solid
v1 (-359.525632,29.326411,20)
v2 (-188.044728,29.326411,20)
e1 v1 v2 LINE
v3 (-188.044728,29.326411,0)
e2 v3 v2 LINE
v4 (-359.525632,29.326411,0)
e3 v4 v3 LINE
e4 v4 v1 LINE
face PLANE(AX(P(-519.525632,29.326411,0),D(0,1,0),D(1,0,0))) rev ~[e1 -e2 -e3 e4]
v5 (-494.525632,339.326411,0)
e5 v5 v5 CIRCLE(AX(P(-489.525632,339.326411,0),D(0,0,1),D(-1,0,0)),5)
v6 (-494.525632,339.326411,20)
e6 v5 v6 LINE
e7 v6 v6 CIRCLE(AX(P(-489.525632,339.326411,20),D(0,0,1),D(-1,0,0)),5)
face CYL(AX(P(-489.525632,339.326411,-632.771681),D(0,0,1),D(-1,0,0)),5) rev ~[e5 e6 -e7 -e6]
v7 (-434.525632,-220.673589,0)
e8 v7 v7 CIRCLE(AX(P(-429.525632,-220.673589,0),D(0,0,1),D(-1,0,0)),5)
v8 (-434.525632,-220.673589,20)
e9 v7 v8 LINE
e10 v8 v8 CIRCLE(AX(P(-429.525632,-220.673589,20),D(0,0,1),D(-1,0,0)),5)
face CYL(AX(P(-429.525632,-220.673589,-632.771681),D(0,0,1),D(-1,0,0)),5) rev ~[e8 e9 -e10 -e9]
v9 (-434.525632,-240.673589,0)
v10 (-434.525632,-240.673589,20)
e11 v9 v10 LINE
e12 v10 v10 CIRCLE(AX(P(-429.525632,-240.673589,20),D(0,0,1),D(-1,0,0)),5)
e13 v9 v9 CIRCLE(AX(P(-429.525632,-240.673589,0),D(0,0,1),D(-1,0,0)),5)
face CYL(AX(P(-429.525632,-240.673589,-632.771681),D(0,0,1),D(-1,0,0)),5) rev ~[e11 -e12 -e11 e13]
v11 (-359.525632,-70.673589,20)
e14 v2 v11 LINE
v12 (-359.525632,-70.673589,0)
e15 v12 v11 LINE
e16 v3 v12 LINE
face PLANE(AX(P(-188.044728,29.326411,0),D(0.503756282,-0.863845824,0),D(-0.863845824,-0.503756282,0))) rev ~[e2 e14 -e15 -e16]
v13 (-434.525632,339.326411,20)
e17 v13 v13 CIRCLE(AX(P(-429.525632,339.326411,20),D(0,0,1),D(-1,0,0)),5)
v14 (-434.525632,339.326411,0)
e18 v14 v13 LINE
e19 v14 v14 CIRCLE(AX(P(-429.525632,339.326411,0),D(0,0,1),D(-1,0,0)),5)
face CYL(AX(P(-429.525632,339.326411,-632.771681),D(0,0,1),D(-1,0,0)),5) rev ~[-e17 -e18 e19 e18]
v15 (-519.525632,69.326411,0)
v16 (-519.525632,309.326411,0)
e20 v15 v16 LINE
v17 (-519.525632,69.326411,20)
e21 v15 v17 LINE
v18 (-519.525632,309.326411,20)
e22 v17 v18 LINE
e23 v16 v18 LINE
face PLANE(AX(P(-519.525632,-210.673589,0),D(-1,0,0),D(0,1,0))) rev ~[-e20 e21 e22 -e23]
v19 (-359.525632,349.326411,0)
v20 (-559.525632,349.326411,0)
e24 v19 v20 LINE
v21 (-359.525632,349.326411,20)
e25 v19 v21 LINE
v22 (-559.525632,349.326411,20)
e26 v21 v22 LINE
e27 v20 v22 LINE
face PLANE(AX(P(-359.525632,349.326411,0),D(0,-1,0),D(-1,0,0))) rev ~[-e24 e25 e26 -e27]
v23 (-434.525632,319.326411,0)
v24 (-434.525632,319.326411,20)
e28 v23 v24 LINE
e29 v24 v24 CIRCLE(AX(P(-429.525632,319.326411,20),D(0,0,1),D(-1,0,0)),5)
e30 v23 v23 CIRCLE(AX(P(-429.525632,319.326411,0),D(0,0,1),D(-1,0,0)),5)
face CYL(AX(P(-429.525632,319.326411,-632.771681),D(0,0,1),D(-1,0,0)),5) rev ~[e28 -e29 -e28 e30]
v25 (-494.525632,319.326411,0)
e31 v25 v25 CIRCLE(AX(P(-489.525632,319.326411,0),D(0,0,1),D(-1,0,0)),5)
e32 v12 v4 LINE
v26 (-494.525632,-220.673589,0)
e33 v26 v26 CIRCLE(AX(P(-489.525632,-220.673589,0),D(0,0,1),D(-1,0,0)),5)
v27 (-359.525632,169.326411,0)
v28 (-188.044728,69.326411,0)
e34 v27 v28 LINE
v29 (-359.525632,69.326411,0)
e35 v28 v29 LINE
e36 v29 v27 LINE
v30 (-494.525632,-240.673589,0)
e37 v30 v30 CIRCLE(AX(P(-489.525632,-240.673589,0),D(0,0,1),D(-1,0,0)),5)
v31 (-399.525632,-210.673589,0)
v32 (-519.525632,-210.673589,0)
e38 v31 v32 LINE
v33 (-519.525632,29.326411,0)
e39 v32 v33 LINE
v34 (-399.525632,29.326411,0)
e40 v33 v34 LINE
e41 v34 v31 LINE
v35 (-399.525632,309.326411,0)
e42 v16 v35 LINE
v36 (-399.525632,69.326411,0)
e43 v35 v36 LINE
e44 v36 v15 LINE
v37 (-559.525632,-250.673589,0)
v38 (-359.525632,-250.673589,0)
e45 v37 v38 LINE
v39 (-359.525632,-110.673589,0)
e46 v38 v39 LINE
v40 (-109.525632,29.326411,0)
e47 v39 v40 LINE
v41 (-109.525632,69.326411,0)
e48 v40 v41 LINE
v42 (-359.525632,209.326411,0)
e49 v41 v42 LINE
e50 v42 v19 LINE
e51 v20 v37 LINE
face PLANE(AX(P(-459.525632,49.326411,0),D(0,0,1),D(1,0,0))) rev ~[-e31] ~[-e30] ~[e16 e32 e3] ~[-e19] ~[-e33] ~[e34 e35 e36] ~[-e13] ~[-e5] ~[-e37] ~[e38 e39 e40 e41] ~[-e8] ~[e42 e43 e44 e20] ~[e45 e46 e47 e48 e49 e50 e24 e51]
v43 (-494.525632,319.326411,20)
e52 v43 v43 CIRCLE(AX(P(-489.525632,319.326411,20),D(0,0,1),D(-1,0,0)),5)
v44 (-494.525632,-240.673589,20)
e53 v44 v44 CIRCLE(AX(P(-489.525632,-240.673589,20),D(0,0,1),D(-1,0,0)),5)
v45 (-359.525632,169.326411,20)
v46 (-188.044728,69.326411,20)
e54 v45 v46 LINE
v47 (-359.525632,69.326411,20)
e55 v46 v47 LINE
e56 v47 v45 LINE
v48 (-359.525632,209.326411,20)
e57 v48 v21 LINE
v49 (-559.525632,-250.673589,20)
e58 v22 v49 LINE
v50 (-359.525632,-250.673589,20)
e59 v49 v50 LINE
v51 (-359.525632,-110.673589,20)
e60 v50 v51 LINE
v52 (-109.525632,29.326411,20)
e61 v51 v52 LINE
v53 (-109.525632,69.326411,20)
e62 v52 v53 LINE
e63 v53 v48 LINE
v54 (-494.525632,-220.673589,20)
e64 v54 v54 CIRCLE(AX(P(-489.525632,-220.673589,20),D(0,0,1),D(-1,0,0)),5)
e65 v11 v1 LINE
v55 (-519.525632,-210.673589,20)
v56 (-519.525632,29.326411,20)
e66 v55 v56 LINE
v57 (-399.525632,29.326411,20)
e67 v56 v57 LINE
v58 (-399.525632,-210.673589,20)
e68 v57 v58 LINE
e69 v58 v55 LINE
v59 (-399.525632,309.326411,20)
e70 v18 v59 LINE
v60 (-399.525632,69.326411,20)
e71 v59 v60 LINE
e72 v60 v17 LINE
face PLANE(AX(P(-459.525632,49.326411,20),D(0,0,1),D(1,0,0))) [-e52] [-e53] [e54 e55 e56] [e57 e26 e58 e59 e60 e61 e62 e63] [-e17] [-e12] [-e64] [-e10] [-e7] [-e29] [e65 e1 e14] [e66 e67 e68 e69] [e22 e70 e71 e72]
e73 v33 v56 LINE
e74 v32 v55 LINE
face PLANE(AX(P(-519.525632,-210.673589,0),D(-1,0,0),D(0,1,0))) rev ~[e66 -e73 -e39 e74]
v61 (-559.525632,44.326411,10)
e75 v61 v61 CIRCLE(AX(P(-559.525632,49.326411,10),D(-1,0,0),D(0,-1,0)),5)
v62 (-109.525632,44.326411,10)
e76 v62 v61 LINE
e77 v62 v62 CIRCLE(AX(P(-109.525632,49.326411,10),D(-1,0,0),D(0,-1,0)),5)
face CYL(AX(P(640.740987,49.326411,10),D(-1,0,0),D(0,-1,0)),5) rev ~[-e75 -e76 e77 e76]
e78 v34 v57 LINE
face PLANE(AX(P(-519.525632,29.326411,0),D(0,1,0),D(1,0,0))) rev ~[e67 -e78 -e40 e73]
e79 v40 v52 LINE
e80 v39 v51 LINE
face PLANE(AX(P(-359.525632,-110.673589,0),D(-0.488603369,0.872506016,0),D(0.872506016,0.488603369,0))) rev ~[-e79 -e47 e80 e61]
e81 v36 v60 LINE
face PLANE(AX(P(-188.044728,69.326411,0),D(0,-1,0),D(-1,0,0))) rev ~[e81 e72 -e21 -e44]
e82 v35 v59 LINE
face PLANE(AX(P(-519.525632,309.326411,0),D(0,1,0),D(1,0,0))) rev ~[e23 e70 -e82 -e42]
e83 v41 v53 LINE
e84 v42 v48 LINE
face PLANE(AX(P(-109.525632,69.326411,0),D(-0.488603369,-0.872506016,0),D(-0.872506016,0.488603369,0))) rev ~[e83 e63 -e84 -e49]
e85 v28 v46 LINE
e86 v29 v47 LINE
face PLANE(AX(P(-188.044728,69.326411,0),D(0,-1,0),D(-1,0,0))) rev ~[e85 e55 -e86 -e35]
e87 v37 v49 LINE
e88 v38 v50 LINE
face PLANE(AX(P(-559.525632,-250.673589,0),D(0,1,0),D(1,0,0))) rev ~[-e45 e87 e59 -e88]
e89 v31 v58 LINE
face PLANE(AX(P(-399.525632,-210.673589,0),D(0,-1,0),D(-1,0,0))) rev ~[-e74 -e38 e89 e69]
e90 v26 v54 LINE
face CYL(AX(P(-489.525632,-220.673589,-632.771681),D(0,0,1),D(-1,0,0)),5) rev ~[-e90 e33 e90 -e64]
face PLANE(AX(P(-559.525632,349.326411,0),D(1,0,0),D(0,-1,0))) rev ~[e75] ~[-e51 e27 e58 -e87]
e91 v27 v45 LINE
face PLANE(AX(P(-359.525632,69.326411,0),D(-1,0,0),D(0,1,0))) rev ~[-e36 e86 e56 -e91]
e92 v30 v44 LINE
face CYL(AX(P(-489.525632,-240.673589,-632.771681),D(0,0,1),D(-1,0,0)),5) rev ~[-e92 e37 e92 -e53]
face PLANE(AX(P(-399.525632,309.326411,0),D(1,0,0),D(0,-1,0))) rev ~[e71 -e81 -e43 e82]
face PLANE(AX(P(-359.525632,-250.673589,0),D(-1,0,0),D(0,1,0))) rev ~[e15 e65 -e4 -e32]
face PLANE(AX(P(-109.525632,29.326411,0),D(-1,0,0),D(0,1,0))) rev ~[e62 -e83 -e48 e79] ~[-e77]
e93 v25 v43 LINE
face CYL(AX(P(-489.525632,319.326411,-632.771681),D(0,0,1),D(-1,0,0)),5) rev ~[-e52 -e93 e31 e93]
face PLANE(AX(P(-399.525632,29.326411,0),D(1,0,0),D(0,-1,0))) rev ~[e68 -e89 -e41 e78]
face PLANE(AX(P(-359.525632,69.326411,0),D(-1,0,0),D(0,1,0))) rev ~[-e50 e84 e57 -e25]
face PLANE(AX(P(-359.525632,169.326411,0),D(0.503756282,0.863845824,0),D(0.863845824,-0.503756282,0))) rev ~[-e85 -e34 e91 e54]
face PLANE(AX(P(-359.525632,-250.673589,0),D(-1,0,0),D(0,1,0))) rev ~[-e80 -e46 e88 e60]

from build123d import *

# Parameters (mm, degrees)
F1_DEPTH = 20
F2_D     = 10
F3_D     = 10
F0_W     = 120
F0_H     = 40
F0_W_2   = 40
F4_DEPTH = 20
F6_D     = 10


# Not quite as in the source:
# - a feature names something its author has since deleted; it is built from what else it names


with BuildPart() as f1:
    # F0 (on Top) → F1 (new body)
    with BuildSketch(Plane.XY):
        Polygon((-359.5256319247, 349.3264111251), (-559.5256319247, 349.3264111251), (-559.5256319247, -250.6735888749), (-359.5256319247, -250.6735888749), (-359.5256319247, -110.6735888749), (-359.5256319247, -70.6735888749), (-359.5256319247, 29.3264111251), (-399.5256319247, 29.3264111251), (-399.5256319247, -210.6735888749), (-519.5256319247, -210.6735888749), (-519.5256319247, 29.3264111251), (-519.5256319247, 69.3264111251), (-519.5256319247, 309.3264111251), (-399.5256319247, 309.3264111251), (-399.5256319247, 69.3264111251), (-359.5256319247, 69.3264111251), (-359.5256319247, 169.3264111251), (-359.5256319247, 209.3264111251), align=None)
    extrude(amount=F1_DEPTH)

    # F2 (through all)
    with Locations(Plane(origin=(0, 0, 0), x_dir=(1, 0, 0), z_dir=(0, 0, -1))):
        with Locations((-489.5256319247, -339.3264111251), (-429.5256319247, -319.3264111251), (-489.5256319247, -319.3264111251), (-489.5256319247, 220.6735888749), (-489.5256319247, 240.6735888749), (-429.5256319247, 240.6735888749), (-429.5256319247, 220.6735888749)):
            Hole(F2_D / 2)

    # F3 (through all)
    with Locations(Plane(origin=(0, 0, 0), x_dir=(1, 0, 0), z_dir=(0, 0, -1))):
        with Locations((-429.5256319247, -339.3264111251)):
            Hole(F3_D / 2)

    # F0 (on Top) → F4 (join)
    with BuildSketch(Plane.XY):
        with Locations((-459.5256319247, 49.3264111251)):
            Rectangle(F0_W, F0_H)
        with Locations((-379.5256319247, 49.3264111251)):
            Rectangle(F0_W_2, F0_H)
        Polygon((-109.5256319247, 29.3264111251), (-109.5256319247, 69.3264111251), (-188.0447282525, 69.3264111251), (-359.5256319247, 69.3264111251), (-359.5256319247, 29.3264111251), (-188.0447282525, 29.3264111251), align=None)
        Polygon((-109.5256319247, 69.3264111251), (-359.5256319247, 209.3264111251), (-359.5256319247, 169.3264111251), (-188.0447282525, 69.3264111251), align=None)
        Polygon((-359.5256319247, -70.6735888749), (-359.5256319247, -110.6735888749), (-109.5256319247, 29.3264111251), (-188.0447282525, 29.3264111251), align=None)
    extrude(amount=F4_DEPTH)

    # F6 (through all)
    with Locations(Plane.YZ.offset(-109.5256319247)):
        with Locations((49.3264111251, 10)):
            Hole(F6_D / 2)


solid = f1.part
